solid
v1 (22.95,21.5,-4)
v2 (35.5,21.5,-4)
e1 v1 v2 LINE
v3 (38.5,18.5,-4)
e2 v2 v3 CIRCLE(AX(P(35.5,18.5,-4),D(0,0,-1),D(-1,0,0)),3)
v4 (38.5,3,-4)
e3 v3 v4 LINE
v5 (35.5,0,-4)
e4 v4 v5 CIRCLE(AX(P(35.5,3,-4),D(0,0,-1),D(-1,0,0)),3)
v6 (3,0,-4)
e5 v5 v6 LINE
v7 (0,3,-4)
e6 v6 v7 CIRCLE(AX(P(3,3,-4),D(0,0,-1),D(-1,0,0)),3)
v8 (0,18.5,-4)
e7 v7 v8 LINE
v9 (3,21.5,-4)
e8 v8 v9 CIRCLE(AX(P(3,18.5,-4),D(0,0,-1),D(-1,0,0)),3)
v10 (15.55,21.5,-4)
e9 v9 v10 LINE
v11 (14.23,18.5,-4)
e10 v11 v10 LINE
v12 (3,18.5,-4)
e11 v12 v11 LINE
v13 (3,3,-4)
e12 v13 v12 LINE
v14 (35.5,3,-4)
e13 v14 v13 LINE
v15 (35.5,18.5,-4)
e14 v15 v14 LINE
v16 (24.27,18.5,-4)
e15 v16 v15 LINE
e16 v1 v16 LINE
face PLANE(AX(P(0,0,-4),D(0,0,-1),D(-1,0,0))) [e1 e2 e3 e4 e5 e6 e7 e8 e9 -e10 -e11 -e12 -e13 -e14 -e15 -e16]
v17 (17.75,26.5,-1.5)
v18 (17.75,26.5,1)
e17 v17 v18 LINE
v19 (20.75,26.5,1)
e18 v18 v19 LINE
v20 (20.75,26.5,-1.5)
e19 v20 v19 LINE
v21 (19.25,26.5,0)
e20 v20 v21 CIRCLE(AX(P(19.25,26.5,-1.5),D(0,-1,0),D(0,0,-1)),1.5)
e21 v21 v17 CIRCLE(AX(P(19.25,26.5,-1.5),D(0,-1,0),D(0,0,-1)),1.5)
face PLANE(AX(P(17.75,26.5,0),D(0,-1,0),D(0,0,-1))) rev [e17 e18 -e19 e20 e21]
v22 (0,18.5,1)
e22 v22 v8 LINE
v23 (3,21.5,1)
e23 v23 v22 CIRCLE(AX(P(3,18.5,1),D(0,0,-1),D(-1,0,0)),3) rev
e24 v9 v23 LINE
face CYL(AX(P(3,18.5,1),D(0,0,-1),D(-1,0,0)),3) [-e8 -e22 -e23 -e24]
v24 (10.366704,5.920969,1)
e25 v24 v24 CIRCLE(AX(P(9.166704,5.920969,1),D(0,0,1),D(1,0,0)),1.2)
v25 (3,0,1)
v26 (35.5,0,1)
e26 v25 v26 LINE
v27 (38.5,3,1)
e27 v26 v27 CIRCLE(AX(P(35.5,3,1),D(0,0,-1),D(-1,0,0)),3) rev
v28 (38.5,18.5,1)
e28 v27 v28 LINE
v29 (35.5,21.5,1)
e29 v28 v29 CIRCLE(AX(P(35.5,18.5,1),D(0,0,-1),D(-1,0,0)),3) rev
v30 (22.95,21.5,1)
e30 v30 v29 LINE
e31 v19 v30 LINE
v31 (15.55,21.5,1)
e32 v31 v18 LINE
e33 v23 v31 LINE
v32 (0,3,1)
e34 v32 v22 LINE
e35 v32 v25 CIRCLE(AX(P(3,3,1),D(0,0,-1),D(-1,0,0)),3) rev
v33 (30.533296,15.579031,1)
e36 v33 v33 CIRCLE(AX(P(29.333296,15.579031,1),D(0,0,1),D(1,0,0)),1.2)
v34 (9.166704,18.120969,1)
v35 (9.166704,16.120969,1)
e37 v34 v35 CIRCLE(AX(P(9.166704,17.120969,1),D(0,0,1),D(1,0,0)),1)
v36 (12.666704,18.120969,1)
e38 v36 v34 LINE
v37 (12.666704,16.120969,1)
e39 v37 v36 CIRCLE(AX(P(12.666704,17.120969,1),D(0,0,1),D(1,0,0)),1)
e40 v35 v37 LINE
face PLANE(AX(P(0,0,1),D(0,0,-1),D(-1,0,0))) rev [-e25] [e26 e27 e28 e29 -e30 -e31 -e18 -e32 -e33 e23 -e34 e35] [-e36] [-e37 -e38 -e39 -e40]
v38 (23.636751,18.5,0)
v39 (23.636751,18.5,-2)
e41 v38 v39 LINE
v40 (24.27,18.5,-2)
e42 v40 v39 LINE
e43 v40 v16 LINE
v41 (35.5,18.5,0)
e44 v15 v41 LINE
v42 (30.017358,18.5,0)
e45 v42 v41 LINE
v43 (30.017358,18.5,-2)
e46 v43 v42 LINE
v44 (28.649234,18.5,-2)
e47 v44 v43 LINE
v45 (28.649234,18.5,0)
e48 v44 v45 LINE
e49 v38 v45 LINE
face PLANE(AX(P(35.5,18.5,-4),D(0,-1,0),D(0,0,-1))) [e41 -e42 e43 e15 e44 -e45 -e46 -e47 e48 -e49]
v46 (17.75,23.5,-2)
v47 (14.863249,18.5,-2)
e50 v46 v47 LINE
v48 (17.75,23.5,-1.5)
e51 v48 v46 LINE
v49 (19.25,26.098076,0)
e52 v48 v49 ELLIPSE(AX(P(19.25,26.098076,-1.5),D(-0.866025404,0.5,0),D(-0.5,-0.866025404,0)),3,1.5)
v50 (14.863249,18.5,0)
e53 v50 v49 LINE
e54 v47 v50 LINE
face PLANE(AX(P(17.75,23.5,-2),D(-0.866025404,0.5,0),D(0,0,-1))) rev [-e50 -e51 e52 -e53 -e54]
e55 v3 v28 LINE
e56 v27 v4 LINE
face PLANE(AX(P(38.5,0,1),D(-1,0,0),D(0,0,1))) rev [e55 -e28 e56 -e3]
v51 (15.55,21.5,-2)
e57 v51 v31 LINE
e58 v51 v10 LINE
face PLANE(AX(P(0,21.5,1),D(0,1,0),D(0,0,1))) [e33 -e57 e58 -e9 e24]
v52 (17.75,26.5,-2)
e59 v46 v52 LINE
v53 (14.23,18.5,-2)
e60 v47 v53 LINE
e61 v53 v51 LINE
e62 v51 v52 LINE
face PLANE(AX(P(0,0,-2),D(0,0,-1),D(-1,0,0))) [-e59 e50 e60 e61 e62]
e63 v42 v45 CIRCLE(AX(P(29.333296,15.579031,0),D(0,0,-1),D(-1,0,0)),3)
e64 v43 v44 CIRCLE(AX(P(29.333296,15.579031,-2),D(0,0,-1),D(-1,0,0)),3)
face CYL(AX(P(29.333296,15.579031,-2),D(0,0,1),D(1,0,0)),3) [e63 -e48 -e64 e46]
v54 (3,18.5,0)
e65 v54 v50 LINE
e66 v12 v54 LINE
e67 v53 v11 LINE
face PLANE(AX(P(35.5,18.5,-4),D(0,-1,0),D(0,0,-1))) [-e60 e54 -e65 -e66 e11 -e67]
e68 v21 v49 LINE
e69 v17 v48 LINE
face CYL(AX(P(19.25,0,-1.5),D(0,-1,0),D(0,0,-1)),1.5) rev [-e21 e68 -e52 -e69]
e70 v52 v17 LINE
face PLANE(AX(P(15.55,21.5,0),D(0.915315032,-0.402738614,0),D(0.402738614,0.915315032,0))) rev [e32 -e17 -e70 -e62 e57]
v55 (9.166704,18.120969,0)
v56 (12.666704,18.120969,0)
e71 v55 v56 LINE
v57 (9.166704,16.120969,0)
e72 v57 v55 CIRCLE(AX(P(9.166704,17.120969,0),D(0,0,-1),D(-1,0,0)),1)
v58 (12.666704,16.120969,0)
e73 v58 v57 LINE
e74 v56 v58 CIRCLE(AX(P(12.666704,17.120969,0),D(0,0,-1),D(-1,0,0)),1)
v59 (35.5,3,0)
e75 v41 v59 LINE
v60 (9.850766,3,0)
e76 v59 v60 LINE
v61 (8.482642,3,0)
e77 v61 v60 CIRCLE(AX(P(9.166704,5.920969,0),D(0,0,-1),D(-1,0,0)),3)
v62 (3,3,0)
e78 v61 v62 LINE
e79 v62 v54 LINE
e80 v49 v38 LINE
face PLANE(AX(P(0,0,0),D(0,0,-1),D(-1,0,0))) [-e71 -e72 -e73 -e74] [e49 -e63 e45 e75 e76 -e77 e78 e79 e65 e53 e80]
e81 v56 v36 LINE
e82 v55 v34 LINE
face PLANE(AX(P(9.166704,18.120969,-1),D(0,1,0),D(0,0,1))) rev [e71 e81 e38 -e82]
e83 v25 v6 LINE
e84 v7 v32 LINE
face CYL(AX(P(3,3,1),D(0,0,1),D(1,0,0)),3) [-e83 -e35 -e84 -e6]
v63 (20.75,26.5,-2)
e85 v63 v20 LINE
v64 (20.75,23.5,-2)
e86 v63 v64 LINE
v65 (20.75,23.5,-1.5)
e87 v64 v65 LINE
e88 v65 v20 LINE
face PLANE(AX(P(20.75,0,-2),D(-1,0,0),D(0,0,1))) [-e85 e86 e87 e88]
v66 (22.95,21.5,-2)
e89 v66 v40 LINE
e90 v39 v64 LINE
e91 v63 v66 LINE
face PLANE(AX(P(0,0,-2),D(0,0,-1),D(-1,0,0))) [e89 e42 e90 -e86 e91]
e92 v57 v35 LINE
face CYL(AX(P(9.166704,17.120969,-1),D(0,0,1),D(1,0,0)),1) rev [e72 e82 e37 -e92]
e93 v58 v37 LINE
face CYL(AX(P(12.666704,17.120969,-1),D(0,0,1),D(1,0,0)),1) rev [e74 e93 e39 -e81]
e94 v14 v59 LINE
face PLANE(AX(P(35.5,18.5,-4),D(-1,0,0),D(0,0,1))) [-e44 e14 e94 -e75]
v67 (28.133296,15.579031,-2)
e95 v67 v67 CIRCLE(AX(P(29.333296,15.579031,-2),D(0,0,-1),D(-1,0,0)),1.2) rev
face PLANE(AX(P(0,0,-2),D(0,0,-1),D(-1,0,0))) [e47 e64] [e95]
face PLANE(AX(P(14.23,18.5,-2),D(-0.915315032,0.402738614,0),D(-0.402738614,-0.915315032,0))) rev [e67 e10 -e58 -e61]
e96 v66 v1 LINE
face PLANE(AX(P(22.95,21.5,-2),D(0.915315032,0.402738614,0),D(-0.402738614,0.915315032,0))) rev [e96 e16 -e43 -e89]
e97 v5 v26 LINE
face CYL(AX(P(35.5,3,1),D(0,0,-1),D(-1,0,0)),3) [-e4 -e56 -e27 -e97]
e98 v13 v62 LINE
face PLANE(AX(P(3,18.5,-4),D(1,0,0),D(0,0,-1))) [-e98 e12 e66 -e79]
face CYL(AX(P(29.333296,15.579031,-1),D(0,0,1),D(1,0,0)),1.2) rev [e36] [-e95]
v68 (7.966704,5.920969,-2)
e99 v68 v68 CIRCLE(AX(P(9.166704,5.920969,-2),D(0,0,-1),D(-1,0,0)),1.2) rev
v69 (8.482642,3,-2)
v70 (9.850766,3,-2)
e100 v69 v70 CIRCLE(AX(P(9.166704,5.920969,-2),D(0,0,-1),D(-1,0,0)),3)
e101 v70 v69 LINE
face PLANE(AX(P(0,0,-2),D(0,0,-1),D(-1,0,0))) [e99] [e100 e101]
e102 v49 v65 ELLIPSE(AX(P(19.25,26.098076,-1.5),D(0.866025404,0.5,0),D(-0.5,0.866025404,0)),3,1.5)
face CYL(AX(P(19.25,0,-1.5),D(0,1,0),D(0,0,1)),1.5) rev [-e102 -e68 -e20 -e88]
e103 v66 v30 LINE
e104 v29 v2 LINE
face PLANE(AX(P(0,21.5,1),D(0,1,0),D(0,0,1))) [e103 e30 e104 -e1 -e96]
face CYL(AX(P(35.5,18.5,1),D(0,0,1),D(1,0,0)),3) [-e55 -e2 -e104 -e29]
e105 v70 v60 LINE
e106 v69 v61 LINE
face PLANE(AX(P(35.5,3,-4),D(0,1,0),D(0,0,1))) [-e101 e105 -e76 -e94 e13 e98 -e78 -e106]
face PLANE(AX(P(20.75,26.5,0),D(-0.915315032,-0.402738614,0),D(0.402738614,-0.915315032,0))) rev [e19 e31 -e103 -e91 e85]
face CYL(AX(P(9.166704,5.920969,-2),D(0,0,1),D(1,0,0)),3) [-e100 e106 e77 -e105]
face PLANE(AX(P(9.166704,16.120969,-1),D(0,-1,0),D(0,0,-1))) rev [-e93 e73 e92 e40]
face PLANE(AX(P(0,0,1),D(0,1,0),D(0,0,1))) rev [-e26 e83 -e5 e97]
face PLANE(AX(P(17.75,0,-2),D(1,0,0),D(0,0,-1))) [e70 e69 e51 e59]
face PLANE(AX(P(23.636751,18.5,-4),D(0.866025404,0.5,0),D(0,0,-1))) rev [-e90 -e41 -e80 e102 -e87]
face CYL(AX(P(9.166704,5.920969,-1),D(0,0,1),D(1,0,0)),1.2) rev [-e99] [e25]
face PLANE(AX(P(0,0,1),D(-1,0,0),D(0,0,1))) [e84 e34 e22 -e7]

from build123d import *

# Parameters (mm, degrees)
SKICA1_W                 = 38.5
SKICA1_H                 = 21.5
P_IDAT_VYSUNUT_M1_DEPTH  = 1
SKICA2_W                 = 38.5
SKICA2_H                 = 21.5
SKICA2_W_2               = 32.5
SKICA2_H_2               = 15.5
P_IDAT_VYSUNUT_M2_DEPTH  = 4
ZAOBLIT1_R               = 3
SKICA3_R                 = 1.2
ODEBRAT_VYSUNUT_M1_DEPTH = 2
SKICA4_R                 = 1.2
P_IDAT_VYSUNUT_M5_DEPTH  = 2
ODEBRAT_VYSUNUT_M2_DEPTH = 2
P_IDAT_VYSUNUT_M6_DEPTH  = 1
P_IDAT_VYSUNUT_M7_DEPTH  = 2
ODEBRAT_VYSUNUT_M5_DEPTH = 2
SKICA10_W                = 3
SKICA10_H                = 3
ODEBRAT_VYSUNUT_M6_DEPTH = 2
ZKOSEN_2_SIZE            = 2.886751346
ZKOSEN_2_SIZE_2          = 5
ZKOSEN_3_SIZE            = 2.886751346
ZKOSEN_3_SIZE_2          = 5
ZAOBLIT4_R               = 1.5


with BuildPart() as part:
    # Skica1 → Přidat vysunutím1 (new body)
    with BuildSketch(Plane.XY):
        with Locations((19.25, 10.75)):
            Rectangle(SKICA1_W, SKICA1_H)
    extrude(amount=P_IDAT_VYSUNUT_M1_DEPTH)

    # Skica2 → Přidat vysunutím2 (add)
    with BuildSketch(Plane(origin=(0, 0, 0), x_dir=(-1, 0, 0), z_dir=(0, 0, -1))):
        with Locations((-19.25, 10.75)):
            Rectangle(SKICA2_W, SKICA2_H)
        with Locations((-19.25, 10.75)):
            Rectangle(SKICA2_W_2, SKICA2_H_2, mode=Mode.SUBTRACT)
    extrude(amount=P_IDAT_VYSUNUT_M2_DEPTH)

    # Zaoblit1
    zaoblit1_edges = [part.edges().sort_by_distance(p)[0] for p in [
        (0, 0, -1.5),
        (38.5, 0, -1.5),
        (38.5, 21.5, -1.5),
        (0, 21.5, -1.5),
    ]]
    fillet(zaoblit1_edges, radius=ZAOBLIT1_R)

    # Skica3 → Odebrat vysunutím1 (cut)
    with BuildSketch(Plane.XY.offset(1)):
        with Locations((9.166704, 5.920968857)):
            Circle(SKICA3_R)
        with Locations((29.333296, 15.579031143)):
            Circle(SKICA3_R)
    extrude(amount=-ODEBRAT_VYSUNUT_M1_DEPTH, mode=Mode.SUBTRACT)

    # Skica4 → Přidat vysunutím5 (add)
    # profile 1 of 2: a face of its own
    with BuildSketch(Plane(origin=(0, 0, 0), x_dir=(-1, 0, 0), z_dir=(0, 0, -1))):
        with BuildLine():
            ThreePointArc((-30.017358084, 18.5), (-31.197137966, 13.228266772), (-26.333296, 15.579031143))
            ThreePointArc((-26.333296, 15.579031143), (-26.98253163, 17.442873109), (-28.649233916, 18.5))
            Line((-28.649233916, 18.5), (-30.017358084, 18.5))
        make_face()
        with Locations(Location((-29.333296, 15.579031143, 0), (0, 0, 180))):
            Circle(SKICA4_R, mode=Mode.SUBTRACT)
    # profile 2 of 2: a face of its own
    with BuildSketch(Plane(origin=(0, 0, 0), x_dir=(-1, 0, 0), z_dir=(0, 0, -1))):
        with BuildLine():
            ThreePointArc((-8.482641916, 3), (-6.81593963, 4.057126891), (-6.166704, 5.920968857))
            ThreePointArc((-6.166704, 5.920968857), (-11.030545966, 8.271733228), (-9.850766084, 3))
            Line((-9.850766084, 3), (-8.482641916, 3))
        make_face()
        with Locations(Location((-9.166704, 5.920968857, 0), (0, 0, 180))):
            Circle(SKICA4_R, mode=Mode.SUBTRACT)
    extrude(amount=P_IDAT_VYSUNUT_M5_DEPTH)

    # Skica5 → Odebrat vysunutím2 (cut)
    with BuildSketch(Plane.XY.offset(1)):
        with BuildLine():
            Line((9.166704, 18.120968857), (12.666704, 18.120968857))
            ThreePointArc((12.666704, 18.120968857), (13.666704, 17.120968857), (12.666704, 16.120968857))
            Line((12.666704, 16.120968857), (9.166704, 16.120968857))
            ThreePointArc((9.166704, 16.120968857), (8.166704, 17.120968857), (9.166704, 18.120968857))
        make_face()
    extrude(amount=-ODEBRAT_VYSUNUT_M2_DEPTH, mode=Mode.SUBTRACT)

    # Skica7 → Přidat vysunutím6 (add)
    with BuildSketch(Plane.XY.offset(1)):
        Polygon((15.55, 21.5), (17.75, 26.5), (20.75, 26.5), (22.95, 21.5), align=None)
    extrude(amount=-P_IDAT_VYSUNUT_M6_DEPTH)

    # Skica8 → Přidat vysunutím7 (add)
    with BuildSketch(Plane(origin=(0, 0, 0), x_dir=(-1, 0, 0), z_dir=(0, 0, -1))):
        Polygon((-15.55, 21.5), (-17.75, 26.5), (-17.75, 21.5), align=None)
        Polygon((-20.75, 26.5), (-22.95, 21.5), (-20.75, 21.5), align=None)
    extrude(amount=P_IDAT_VYSUNUT_M7_DEPTH)

    # Skica9 → Odebrat vysunutím5 (cut)
    with BuildSketch(Plane(origin=(0, 0, -4), x_dir=(-1, 0, 0), z_dir=(0, 0, -1))):
        Polygon((-22.95, 21.5), (-24.27, 18.5), (-14.23, 18.5), (-15.55, 21.5), align=None)
    extrude(amount=-ODEBRAT_VYSUNUT_M5_DEPTH, mode=Mode.SUBTRACT)

    # Skica10 → Odebrat vysunutím6 (cut)
    with BuildSketch(Plane(origin=(0, 0, -2), x_dir=(-1, 0, 0), z_dir=(0, 0, -1))):
        with Locations((-19.25, 20)):
            Rectangle(SKICA10_W, SKICA10_H)
    extrude(amount=-ODEBRAT_VYSUNUT_M6_DEPTH, mode=Mode.SUBTRACT)

    # Zkosení2
    # the kernel refuses this chamfer: 5, 2.886751346 mm, written as the material it takes off along each edge
    with BuildSketch(Plane(origin=(20.75, 18.5, -14.935428773), x_dir=(0.9983227437537926, -0.057893862402670485, 0), z_dir=(0, 0, 1))) as zkosen_2_piece_1:
        Polygon((ZKOSEN_2_SIZE * 0.998322743736, ZKOSEN_2_SIZE * 0.0578938624016), (-ZKOSEN_2_SIZE_2 * 0.0578938624027, ZKOSEN_2_SIZE_2 * 0.998322743754), (0, 0), align=None)
    extrude(amount=14.935428773, mode=Mode.SUBTRACT)

    # Zkosení3
    # the kernel refuses this chamfer: 5, 2.886751346 mm, written as the material it takes off along each edge
    with BuildSketch(Plane(origin=(17.75, 18.5, -14.935428773), x_dir=(-0.9983227437537926, -0.05789386240267058, 0), z_dir=(0, 0, 1))) as zkosen_3_piece_1:
        Polygon((ZKOSEN_3_SIZE * 0.998322743736, -ZKOSEN_3_SIZE * 0.0578938624016), (-ZKOSEN_3_SIZE_2 * 0.0578938624027, -ZKOSEN_3_SIZE_2 * 0.998322743754), (0, 0), align=None)
    extrude(amount=14.935428773, mode=Mode.SUBTRACT)

    # Zaoblit4
    # the kernel refuses this fillet: 1.5 mm, written as the material it adds along each edge
    with BuildSketch(Plane(origin=(17.75, 26.5, 0), x_dir=(1, 0, 0), z_dir=(0, -1, 0))) as zaoblit4_piece_1_section:
        with BuildLine():
            CenterArc((ZAOBLIT4_R, -ZAOBLIT4_R), ZAOBLIT4_R, 90, 90)
            Line((0, -ZAOBLIT4_R), (0, 0))
            Line((0, 0), (ZAOBLIT4_R, 0))
        make_face()
    zaoblit4_piece_1 = extrude(amount=6.75, mode=Mode.PRIVATE)
    zaoblit4_piece_1 = split(zaoblit4_piece_1, bisect_by=Plane(origin=(17.323921005, 25.531638648, -0.383561124), z_dir=(0.9153150324227655, -0.4027386142660173, 0)), keep=Keep.TOP, mode=Mode.PRIVATE)
    zaoblit4_piece_1 = split(zaoblit4_piece_1, bisect_by=Plane(origin=(18.56429614, 24.910402286, -0.383561124), z_dir=(-0.8660254037846095, 0.4999999999997042, 0)), keep=Keep.TOP, mode=Mode.PRIVATE)
    add(zaoblit4_piece_1)
    with BuildSketch(Plane(origin=(20.75, 19.75, 0), x_dir=(0, 0, -1), z_dir=(0, 1, 0))) as zaoblit4_piece_2_section:
        with BuildLine():
            CenterArc((ZAOBLIT4_R, ZAOBLIT4_R), ZAOBLIT4_R, 180, 90)
            Line((0, ZAOBLIT4_R), (0, 0))
            Line((0, 0), (ZAOBLIT4_R, 0))
        make_face()
    zaoblit4_piece_2 = extrude(amount=6.75, mode=Mode.PRIVATE)
    zaoblit4_piece_2 = split(zaoblit4_piece_2, bisect_by=Plane(origin=(21.176078995, 25.531638648, -0.383561124), z_dir=(-0.9153150324227657, -0.4027386142660168, 0)), keep=Keep.TOP, mode=Mode.PRIVATE)
    zaoblit4_piece_2 = split(zaoblit4_piece_2, bisect_by=Plane(origin=(19.93570386, 24.910402286, -0.383561124), z_dir=(0.8660254037846095, 0.4999999999997042, 0)), keep=Keep.TOP, mode=Mode.PRIVATE)
    add(zaoblit4_piece_2)


solid = part.part
